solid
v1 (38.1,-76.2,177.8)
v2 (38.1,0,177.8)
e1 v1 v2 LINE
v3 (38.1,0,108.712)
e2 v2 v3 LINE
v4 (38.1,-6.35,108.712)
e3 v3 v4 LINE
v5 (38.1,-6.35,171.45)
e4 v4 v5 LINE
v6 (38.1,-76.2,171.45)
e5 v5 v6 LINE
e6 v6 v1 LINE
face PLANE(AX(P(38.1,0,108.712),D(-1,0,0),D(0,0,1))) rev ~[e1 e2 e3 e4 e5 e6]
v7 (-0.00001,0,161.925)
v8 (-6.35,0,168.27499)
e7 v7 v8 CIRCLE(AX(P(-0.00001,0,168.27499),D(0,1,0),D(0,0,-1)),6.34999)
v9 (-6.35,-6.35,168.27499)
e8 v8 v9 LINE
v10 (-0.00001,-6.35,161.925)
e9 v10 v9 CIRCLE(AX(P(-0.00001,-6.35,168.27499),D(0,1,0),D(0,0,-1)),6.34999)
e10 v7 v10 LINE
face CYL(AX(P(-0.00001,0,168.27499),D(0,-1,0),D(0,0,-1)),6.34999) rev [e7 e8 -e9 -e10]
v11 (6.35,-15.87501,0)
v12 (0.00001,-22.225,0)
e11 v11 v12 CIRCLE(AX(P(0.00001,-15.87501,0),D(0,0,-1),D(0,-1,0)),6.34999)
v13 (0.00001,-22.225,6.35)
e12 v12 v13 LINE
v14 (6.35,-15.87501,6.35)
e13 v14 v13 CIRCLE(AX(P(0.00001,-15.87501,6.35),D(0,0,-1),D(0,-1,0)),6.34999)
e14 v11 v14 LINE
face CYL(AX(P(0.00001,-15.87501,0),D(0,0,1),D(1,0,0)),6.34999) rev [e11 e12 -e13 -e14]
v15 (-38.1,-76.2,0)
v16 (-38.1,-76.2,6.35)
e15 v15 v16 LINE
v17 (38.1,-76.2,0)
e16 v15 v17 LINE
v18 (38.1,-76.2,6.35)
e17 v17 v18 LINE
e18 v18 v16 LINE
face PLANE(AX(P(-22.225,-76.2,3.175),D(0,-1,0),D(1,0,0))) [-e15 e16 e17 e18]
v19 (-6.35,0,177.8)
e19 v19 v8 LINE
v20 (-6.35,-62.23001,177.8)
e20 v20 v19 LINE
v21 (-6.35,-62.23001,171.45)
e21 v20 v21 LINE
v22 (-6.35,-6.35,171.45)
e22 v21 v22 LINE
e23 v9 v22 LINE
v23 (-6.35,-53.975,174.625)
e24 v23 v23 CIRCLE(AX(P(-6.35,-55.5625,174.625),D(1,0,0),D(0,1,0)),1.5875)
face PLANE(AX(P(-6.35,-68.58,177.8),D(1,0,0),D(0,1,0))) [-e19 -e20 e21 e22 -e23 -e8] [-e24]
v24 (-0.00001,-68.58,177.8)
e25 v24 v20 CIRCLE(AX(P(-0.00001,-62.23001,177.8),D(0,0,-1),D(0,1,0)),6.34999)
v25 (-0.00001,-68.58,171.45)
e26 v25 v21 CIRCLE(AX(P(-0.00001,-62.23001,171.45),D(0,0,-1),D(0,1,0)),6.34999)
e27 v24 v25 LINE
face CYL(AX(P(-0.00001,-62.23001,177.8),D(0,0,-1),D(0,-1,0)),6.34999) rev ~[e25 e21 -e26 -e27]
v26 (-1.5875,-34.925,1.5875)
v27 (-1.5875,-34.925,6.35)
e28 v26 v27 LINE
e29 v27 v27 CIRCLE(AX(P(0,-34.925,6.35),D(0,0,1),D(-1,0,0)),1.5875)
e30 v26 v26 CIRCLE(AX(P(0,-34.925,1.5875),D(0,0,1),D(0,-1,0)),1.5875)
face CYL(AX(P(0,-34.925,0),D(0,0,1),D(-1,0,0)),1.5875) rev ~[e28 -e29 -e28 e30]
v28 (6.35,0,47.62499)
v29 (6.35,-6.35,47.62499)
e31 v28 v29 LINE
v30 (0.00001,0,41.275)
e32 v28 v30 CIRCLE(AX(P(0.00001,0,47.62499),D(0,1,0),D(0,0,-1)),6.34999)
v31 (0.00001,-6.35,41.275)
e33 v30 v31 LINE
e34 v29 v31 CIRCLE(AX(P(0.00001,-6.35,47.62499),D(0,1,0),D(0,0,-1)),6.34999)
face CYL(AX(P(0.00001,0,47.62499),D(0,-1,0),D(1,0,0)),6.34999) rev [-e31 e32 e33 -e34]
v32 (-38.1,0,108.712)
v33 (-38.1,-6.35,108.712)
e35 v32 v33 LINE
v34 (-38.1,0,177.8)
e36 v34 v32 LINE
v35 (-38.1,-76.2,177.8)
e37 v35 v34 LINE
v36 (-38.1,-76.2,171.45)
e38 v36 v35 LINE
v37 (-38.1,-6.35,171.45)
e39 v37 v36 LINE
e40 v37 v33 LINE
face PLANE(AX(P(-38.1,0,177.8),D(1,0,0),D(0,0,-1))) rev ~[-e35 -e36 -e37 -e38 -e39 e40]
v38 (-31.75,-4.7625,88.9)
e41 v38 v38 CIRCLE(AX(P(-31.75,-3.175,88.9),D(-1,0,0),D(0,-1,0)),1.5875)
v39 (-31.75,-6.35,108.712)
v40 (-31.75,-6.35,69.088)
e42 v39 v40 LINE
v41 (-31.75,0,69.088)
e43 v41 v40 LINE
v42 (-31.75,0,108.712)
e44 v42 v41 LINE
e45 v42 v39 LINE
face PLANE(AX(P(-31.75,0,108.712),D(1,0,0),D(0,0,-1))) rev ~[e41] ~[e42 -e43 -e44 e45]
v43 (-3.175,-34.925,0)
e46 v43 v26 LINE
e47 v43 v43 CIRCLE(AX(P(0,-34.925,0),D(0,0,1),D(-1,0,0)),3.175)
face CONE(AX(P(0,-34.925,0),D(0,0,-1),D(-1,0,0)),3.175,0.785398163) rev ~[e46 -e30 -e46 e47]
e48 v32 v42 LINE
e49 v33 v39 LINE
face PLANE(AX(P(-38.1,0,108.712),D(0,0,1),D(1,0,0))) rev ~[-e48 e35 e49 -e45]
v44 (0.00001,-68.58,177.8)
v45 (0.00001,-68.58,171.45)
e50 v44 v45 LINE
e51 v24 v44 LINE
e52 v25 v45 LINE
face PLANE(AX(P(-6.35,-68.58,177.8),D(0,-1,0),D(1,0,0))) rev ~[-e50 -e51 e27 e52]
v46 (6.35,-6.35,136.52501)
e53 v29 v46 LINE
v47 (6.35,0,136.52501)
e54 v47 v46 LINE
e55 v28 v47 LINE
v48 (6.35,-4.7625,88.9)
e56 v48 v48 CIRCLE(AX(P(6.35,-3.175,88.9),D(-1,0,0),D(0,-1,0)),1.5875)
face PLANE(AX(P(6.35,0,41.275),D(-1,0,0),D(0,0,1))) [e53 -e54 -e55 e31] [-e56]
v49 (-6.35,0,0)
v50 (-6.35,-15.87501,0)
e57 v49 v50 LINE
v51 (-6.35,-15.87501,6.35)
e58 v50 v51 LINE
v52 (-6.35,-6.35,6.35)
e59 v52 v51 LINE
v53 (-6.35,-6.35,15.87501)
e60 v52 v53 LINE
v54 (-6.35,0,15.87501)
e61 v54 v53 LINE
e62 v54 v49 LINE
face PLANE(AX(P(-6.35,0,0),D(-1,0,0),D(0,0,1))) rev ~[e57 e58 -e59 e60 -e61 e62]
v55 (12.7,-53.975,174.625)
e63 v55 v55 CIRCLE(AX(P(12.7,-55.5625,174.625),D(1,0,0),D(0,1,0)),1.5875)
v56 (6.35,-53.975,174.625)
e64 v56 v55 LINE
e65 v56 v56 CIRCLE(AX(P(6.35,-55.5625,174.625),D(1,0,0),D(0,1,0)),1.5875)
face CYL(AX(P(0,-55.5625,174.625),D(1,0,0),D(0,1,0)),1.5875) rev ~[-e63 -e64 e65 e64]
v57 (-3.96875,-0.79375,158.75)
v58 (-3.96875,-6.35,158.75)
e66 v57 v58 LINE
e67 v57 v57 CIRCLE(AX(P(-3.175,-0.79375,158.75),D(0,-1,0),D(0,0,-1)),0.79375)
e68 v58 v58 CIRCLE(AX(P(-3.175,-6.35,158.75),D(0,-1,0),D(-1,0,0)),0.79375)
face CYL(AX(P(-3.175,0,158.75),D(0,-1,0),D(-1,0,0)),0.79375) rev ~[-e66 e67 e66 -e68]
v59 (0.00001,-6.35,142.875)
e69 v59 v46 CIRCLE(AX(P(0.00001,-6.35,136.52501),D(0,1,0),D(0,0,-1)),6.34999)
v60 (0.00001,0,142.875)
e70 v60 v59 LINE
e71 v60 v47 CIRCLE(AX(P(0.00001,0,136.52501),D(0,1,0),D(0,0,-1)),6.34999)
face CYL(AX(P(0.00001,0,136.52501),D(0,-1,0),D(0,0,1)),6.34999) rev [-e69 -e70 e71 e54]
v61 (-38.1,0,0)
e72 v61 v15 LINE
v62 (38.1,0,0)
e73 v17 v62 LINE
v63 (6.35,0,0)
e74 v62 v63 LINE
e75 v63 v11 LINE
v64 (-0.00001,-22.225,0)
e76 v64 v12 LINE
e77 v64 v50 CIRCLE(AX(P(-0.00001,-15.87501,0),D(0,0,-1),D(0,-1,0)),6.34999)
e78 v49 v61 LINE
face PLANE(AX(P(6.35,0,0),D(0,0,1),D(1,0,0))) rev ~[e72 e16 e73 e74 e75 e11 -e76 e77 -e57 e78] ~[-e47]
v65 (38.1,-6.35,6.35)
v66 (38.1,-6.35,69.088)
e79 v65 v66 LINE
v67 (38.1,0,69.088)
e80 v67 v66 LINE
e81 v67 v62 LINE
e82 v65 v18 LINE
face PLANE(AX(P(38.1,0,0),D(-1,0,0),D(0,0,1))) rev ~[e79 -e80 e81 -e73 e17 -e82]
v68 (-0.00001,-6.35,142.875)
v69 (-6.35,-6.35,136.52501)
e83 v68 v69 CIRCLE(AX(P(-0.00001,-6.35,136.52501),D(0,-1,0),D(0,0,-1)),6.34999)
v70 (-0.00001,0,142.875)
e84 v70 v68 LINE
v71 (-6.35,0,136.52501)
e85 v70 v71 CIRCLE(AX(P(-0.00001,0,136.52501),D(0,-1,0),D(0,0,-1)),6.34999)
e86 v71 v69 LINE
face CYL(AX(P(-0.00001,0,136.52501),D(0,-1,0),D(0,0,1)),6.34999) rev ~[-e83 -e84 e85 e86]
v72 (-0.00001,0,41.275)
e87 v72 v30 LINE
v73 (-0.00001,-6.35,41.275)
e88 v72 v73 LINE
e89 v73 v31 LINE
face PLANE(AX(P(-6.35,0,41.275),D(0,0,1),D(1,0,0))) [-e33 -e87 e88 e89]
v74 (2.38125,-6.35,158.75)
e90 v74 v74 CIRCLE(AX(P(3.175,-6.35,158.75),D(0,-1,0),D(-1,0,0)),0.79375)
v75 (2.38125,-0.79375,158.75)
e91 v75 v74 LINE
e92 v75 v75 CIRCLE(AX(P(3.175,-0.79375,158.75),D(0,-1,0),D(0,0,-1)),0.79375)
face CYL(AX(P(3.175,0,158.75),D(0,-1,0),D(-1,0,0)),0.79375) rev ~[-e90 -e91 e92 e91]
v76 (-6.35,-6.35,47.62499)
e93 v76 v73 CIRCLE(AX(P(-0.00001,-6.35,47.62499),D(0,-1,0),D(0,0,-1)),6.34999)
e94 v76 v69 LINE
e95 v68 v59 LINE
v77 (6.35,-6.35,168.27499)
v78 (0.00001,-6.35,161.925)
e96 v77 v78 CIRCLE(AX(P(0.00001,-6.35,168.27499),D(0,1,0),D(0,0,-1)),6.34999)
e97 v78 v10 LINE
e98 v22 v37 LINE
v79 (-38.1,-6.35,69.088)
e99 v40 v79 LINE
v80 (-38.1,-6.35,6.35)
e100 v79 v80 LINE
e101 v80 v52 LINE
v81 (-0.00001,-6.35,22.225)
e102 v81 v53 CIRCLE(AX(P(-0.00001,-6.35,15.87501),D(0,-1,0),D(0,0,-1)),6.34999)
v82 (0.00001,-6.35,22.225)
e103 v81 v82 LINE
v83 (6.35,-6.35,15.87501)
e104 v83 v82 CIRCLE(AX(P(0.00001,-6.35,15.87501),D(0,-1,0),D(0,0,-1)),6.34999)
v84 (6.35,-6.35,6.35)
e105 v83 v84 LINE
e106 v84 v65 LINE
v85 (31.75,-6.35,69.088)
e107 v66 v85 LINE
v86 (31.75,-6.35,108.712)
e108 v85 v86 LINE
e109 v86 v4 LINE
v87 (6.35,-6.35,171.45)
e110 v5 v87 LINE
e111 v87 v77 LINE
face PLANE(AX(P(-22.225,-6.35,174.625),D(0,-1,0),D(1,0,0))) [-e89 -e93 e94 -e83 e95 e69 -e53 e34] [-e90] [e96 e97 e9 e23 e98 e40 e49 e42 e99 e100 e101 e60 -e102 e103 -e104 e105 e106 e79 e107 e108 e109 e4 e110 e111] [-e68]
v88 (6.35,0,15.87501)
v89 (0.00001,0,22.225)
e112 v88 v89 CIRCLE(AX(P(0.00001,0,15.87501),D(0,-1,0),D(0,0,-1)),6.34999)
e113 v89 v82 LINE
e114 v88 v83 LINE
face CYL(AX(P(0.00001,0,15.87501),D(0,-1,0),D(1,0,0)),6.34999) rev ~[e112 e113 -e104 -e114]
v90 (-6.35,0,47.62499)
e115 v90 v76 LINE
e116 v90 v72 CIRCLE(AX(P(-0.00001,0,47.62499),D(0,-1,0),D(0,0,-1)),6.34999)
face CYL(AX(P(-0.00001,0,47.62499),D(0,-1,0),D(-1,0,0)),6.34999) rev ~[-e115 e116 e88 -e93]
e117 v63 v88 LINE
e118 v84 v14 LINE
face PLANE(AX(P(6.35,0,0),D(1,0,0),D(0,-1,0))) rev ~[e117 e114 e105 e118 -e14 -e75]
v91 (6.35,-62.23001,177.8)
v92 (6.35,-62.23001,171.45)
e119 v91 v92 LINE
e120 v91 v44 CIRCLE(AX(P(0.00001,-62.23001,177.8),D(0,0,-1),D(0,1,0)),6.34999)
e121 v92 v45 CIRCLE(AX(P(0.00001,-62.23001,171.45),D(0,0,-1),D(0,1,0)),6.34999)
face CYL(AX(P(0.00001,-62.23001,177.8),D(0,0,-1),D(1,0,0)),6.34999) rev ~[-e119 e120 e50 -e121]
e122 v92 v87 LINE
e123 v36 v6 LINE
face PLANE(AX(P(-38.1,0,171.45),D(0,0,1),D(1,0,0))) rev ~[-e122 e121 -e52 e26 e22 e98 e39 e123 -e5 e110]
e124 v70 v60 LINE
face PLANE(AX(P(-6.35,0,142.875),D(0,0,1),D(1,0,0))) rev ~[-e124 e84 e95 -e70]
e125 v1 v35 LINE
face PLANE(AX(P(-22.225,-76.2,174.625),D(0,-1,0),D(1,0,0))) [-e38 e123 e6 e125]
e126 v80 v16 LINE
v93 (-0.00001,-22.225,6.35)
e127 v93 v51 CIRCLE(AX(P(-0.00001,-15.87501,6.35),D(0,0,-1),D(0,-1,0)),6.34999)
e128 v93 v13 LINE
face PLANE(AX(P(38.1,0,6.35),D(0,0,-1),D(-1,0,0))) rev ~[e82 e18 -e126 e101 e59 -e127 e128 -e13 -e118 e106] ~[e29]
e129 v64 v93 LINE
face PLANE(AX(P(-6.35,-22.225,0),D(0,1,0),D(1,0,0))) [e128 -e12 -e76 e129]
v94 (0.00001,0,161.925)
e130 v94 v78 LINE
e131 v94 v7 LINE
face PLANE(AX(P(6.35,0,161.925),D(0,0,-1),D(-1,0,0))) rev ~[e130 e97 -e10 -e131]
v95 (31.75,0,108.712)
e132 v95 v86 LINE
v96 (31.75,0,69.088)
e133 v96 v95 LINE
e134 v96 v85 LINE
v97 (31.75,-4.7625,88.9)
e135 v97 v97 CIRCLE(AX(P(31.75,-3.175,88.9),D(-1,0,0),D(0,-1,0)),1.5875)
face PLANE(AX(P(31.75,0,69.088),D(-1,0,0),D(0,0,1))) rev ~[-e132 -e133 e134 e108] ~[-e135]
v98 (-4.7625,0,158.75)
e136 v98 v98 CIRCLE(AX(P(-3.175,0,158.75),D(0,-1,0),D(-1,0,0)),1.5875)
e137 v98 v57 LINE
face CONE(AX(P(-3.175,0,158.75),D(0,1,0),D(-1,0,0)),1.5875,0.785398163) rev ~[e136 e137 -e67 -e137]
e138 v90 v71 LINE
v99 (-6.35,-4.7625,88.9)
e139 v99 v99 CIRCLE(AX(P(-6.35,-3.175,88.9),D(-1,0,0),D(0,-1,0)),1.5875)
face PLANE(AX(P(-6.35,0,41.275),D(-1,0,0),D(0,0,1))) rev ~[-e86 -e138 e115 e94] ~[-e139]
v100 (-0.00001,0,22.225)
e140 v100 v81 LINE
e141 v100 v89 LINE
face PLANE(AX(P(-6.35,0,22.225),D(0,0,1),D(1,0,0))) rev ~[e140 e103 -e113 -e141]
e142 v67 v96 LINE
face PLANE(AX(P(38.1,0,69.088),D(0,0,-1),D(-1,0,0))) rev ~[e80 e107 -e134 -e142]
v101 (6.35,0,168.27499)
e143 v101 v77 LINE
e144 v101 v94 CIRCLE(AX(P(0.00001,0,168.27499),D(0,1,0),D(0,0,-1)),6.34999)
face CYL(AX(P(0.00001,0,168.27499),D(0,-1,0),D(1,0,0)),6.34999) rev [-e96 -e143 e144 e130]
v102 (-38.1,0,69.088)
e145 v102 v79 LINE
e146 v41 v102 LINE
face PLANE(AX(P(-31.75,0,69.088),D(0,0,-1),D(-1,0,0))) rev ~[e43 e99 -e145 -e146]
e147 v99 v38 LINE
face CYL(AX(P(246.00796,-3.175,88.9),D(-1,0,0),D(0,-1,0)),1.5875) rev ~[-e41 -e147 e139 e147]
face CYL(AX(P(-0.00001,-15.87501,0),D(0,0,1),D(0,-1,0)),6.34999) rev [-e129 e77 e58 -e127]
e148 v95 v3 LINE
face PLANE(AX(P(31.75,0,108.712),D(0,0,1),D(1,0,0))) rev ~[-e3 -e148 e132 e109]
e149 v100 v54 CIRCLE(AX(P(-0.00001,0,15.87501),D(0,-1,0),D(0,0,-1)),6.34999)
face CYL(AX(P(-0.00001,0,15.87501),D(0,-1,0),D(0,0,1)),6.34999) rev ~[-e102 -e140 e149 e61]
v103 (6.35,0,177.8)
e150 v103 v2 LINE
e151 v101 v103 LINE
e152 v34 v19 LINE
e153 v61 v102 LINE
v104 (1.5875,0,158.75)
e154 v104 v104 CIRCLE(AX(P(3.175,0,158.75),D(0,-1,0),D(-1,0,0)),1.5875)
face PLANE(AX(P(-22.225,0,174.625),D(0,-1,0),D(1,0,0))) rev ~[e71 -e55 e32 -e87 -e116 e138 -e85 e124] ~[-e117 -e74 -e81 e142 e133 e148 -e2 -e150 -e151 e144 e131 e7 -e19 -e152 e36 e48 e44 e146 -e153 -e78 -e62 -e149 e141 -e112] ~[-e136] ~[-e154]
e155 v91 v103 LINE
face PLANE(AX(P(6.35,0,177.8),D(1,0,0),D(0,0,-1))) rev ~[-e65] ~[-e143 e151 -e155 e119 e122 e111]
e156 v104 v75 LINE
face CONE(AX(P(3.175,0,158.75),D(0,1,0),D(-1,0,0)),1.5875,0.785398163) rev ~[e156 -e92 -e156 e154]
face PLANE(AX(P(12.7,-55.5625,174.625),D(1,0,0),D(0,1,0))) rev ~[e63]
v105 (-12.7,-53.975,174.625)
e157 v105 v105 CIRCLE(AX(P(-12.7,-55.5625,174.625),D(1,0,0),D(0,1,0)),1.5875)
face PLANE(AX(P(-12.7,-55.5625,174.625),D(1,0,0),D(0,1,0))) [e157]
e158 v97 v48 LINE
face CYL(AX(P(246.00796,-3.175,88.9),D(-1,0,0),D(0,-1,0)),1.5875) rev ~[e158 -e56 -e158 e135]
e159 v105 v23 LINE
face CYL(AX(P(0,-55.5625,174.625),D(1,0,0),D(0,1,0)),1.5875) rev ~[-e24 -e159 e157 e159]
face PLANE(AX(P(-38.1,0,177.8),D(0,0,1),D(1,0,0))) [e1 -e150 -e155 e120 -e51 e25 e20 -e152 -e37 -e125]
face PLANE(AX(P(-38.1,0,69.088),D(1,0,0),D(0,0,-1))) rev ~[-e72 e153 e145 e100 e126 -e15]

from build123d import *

# Parameters (mm, degrees)
F0_W            = 31.75
F0_H            = 6.35
F0_W_2          = 12.7
F0_H_2          = 101.6
F1_DEPTH        = 6.35
F2_DEPTH        = 76.2
F3_W            = 12.7
F3_H            = 68.58
F4_DEPTH        = 6.35
F5_W            = 12.7
F5_H            = 22.225
F6_DEPTH        = 6.35
F7_D            = 1.5875
F7_CSINK_D      = 3.175
F7_CSINK_ANGLE  = 90
F8_R            = 6.34999
F10_D           = 3.175
F12_D           = 3.175
F12_CSINK_D     = 6.35
F12_CSINK_ANGLE = 90
F13_R           = 1.5875
F14_DEPTH       = 12.7


# Not quite as in the source:
# - a fillet or chamfer is up to 0.001 mm smaller than in the source, because OpenCascade refuses the exact size


with BuildPart() as f1:
    # F0 (on Front) → F1 (new body)
    with BuildSketch(Plane.XZ):
        with Locations((-22.225, 174.625)):
            Rectangle(F0_W, F0_H)
        with Locations((22.225, 174.625)):
            Rectangle(F0_W, F0_H)
        with Locations((-22.225, 3.175)):
            Rectangle(F0_W, F0_H)
        with Locations((22.225, 3.175)):
            Rectangle(F0_W, F0_H)
        Polygon((-6.35, 171.45), (-38.1, 171.45), (-38.1, 108.712), (-31.75, 108.712), (-31.75, 69.088), (-38.1, 69.088), (-38.1, 6.35), (-6.35, 6.35), (-6.35, 22.225), (6.35, 22.225), (6.35, 6.35), (38.1, 6.35), (38.1, 69.088), (31.75, 69.088), (31.75, 108.712), (38.1, 108.712), (38.1, 171.45), (6.35, 171.45), (6.35, 161.925), (-6.35, 161.925), align=None)
        with Locations((0, 92.075)):
            Rectangle(F0_W_2, F0_H_2, mode=Mode.SUBTRACT)
    extrude(amount=F1_DEPTH)

    # F0 (on Front) → F2 (join)
    with BuildSketch(Plane.XZ):
        with Locations((-22.225, 174.625)):
            Rectangle(F0_W, F0_H)
        with Locations((22.225, 174.625)):
            Rectangle(F0_W, F0_H)
        with Locations((-22.225, 3.175)):
            Rectangle(F0_W, F0_H)
        with Locations((22.225, 3.175)):
            Rectangle(F0_W, F0_H)
        with Locations((0, 3.175)):
            Rectangle(F0_W_2, F0_H)
        with Locations((0, 174.625)):
            Rectangle(F0_W_2, F0_H)
    extrude(amount=F2_DEPTH)

    # F3 (on face) → F4 (cut, through all)
    with BuildSketch(Plane.XY.offset(177.8)):
        with Locations((0, -34.29)):
            Rectangle(F3_W, F3_H)
    extrude(amount=-F4_DEPTH, mode=Mode.SUBTRACT)

    # F5 (on face) → F6 (cut, through all)
    with BuildSketch(Plane(origin=(0, 0, 0), x_dir=(1, 0, 0), z_dir=(0, 0, -1))):
        with Locations((0, 11.1125)):
            Rectangle(F5_W, F5_H)
    extrude(amount=-F6_DEPTH, mode=Mode.SUBTRACT)

    # F7 (through all)
    with Locations(Plane(origin=(0, 0, 0), x_dir=(1, 0, 0), z_dir=(0, 1, 0))):
        with Locations((-3.175, -158.75), (3.175, -158.75)):
            CounterSinkHole(F7_D / 2, F7_CSINK_D / 2, counter_sink_angle=F7_CSINK_ANGLE)

    # F8 (radius 6.35 in the source; OpenCascade refuses exactly that, so slightly less here)
    f8_edges = [f1.edges().sort_by_distance(p)[0] for p in [
        (-6.35, -3.175, 22.225),
        (6.35, -3.175, 22.225),
        (-6.35, -3.175, 161.925),
        (6.35, -3.175, 161.925),
        (-6.35, -68.58, 174.625),
        (6.35, -68.58, 174.625),
        (6.35, -22.225, 3.175),
        (-6.35, -22.225, 3.175),
        (-6.35, -3.175, 41.275),
        (6.35, -3.175, 41.275),
        (-6.35, -3.175, 142.875),
        (6.35, -3.175, 142.875),
    ]]
    fillet(f8_edges, radius=F8_R)

    # F10 (through all)
    with Locations(Plane.YZ.offset(38.1)):
        with Locations((-3.175, 88.9)):
            Hole(F10_D / 2)

    # F12 (through all)
    with Locations(Plane(origin=(0, 0, 0), x_dir=(1, 0, 0), z_dir=(0, 0, -1))):
        with Locations((0, 34.925)):
            CounterSinkHole(F12_D / 2, F12_CSINK_D / 2, counter_sink_angle=F12_CSINK_ANGLE)

    # F13 (on Right) → F14 (cut, symmetric)
    with BuildSketch(Plane.YZ):
        with Locations((-55.5625, 174.625)):
            Circle(F13_R)
    extrude(amount=F14_DEPTH, both=True, mode=Mode.SUBTRACT)


solid = f1.part
